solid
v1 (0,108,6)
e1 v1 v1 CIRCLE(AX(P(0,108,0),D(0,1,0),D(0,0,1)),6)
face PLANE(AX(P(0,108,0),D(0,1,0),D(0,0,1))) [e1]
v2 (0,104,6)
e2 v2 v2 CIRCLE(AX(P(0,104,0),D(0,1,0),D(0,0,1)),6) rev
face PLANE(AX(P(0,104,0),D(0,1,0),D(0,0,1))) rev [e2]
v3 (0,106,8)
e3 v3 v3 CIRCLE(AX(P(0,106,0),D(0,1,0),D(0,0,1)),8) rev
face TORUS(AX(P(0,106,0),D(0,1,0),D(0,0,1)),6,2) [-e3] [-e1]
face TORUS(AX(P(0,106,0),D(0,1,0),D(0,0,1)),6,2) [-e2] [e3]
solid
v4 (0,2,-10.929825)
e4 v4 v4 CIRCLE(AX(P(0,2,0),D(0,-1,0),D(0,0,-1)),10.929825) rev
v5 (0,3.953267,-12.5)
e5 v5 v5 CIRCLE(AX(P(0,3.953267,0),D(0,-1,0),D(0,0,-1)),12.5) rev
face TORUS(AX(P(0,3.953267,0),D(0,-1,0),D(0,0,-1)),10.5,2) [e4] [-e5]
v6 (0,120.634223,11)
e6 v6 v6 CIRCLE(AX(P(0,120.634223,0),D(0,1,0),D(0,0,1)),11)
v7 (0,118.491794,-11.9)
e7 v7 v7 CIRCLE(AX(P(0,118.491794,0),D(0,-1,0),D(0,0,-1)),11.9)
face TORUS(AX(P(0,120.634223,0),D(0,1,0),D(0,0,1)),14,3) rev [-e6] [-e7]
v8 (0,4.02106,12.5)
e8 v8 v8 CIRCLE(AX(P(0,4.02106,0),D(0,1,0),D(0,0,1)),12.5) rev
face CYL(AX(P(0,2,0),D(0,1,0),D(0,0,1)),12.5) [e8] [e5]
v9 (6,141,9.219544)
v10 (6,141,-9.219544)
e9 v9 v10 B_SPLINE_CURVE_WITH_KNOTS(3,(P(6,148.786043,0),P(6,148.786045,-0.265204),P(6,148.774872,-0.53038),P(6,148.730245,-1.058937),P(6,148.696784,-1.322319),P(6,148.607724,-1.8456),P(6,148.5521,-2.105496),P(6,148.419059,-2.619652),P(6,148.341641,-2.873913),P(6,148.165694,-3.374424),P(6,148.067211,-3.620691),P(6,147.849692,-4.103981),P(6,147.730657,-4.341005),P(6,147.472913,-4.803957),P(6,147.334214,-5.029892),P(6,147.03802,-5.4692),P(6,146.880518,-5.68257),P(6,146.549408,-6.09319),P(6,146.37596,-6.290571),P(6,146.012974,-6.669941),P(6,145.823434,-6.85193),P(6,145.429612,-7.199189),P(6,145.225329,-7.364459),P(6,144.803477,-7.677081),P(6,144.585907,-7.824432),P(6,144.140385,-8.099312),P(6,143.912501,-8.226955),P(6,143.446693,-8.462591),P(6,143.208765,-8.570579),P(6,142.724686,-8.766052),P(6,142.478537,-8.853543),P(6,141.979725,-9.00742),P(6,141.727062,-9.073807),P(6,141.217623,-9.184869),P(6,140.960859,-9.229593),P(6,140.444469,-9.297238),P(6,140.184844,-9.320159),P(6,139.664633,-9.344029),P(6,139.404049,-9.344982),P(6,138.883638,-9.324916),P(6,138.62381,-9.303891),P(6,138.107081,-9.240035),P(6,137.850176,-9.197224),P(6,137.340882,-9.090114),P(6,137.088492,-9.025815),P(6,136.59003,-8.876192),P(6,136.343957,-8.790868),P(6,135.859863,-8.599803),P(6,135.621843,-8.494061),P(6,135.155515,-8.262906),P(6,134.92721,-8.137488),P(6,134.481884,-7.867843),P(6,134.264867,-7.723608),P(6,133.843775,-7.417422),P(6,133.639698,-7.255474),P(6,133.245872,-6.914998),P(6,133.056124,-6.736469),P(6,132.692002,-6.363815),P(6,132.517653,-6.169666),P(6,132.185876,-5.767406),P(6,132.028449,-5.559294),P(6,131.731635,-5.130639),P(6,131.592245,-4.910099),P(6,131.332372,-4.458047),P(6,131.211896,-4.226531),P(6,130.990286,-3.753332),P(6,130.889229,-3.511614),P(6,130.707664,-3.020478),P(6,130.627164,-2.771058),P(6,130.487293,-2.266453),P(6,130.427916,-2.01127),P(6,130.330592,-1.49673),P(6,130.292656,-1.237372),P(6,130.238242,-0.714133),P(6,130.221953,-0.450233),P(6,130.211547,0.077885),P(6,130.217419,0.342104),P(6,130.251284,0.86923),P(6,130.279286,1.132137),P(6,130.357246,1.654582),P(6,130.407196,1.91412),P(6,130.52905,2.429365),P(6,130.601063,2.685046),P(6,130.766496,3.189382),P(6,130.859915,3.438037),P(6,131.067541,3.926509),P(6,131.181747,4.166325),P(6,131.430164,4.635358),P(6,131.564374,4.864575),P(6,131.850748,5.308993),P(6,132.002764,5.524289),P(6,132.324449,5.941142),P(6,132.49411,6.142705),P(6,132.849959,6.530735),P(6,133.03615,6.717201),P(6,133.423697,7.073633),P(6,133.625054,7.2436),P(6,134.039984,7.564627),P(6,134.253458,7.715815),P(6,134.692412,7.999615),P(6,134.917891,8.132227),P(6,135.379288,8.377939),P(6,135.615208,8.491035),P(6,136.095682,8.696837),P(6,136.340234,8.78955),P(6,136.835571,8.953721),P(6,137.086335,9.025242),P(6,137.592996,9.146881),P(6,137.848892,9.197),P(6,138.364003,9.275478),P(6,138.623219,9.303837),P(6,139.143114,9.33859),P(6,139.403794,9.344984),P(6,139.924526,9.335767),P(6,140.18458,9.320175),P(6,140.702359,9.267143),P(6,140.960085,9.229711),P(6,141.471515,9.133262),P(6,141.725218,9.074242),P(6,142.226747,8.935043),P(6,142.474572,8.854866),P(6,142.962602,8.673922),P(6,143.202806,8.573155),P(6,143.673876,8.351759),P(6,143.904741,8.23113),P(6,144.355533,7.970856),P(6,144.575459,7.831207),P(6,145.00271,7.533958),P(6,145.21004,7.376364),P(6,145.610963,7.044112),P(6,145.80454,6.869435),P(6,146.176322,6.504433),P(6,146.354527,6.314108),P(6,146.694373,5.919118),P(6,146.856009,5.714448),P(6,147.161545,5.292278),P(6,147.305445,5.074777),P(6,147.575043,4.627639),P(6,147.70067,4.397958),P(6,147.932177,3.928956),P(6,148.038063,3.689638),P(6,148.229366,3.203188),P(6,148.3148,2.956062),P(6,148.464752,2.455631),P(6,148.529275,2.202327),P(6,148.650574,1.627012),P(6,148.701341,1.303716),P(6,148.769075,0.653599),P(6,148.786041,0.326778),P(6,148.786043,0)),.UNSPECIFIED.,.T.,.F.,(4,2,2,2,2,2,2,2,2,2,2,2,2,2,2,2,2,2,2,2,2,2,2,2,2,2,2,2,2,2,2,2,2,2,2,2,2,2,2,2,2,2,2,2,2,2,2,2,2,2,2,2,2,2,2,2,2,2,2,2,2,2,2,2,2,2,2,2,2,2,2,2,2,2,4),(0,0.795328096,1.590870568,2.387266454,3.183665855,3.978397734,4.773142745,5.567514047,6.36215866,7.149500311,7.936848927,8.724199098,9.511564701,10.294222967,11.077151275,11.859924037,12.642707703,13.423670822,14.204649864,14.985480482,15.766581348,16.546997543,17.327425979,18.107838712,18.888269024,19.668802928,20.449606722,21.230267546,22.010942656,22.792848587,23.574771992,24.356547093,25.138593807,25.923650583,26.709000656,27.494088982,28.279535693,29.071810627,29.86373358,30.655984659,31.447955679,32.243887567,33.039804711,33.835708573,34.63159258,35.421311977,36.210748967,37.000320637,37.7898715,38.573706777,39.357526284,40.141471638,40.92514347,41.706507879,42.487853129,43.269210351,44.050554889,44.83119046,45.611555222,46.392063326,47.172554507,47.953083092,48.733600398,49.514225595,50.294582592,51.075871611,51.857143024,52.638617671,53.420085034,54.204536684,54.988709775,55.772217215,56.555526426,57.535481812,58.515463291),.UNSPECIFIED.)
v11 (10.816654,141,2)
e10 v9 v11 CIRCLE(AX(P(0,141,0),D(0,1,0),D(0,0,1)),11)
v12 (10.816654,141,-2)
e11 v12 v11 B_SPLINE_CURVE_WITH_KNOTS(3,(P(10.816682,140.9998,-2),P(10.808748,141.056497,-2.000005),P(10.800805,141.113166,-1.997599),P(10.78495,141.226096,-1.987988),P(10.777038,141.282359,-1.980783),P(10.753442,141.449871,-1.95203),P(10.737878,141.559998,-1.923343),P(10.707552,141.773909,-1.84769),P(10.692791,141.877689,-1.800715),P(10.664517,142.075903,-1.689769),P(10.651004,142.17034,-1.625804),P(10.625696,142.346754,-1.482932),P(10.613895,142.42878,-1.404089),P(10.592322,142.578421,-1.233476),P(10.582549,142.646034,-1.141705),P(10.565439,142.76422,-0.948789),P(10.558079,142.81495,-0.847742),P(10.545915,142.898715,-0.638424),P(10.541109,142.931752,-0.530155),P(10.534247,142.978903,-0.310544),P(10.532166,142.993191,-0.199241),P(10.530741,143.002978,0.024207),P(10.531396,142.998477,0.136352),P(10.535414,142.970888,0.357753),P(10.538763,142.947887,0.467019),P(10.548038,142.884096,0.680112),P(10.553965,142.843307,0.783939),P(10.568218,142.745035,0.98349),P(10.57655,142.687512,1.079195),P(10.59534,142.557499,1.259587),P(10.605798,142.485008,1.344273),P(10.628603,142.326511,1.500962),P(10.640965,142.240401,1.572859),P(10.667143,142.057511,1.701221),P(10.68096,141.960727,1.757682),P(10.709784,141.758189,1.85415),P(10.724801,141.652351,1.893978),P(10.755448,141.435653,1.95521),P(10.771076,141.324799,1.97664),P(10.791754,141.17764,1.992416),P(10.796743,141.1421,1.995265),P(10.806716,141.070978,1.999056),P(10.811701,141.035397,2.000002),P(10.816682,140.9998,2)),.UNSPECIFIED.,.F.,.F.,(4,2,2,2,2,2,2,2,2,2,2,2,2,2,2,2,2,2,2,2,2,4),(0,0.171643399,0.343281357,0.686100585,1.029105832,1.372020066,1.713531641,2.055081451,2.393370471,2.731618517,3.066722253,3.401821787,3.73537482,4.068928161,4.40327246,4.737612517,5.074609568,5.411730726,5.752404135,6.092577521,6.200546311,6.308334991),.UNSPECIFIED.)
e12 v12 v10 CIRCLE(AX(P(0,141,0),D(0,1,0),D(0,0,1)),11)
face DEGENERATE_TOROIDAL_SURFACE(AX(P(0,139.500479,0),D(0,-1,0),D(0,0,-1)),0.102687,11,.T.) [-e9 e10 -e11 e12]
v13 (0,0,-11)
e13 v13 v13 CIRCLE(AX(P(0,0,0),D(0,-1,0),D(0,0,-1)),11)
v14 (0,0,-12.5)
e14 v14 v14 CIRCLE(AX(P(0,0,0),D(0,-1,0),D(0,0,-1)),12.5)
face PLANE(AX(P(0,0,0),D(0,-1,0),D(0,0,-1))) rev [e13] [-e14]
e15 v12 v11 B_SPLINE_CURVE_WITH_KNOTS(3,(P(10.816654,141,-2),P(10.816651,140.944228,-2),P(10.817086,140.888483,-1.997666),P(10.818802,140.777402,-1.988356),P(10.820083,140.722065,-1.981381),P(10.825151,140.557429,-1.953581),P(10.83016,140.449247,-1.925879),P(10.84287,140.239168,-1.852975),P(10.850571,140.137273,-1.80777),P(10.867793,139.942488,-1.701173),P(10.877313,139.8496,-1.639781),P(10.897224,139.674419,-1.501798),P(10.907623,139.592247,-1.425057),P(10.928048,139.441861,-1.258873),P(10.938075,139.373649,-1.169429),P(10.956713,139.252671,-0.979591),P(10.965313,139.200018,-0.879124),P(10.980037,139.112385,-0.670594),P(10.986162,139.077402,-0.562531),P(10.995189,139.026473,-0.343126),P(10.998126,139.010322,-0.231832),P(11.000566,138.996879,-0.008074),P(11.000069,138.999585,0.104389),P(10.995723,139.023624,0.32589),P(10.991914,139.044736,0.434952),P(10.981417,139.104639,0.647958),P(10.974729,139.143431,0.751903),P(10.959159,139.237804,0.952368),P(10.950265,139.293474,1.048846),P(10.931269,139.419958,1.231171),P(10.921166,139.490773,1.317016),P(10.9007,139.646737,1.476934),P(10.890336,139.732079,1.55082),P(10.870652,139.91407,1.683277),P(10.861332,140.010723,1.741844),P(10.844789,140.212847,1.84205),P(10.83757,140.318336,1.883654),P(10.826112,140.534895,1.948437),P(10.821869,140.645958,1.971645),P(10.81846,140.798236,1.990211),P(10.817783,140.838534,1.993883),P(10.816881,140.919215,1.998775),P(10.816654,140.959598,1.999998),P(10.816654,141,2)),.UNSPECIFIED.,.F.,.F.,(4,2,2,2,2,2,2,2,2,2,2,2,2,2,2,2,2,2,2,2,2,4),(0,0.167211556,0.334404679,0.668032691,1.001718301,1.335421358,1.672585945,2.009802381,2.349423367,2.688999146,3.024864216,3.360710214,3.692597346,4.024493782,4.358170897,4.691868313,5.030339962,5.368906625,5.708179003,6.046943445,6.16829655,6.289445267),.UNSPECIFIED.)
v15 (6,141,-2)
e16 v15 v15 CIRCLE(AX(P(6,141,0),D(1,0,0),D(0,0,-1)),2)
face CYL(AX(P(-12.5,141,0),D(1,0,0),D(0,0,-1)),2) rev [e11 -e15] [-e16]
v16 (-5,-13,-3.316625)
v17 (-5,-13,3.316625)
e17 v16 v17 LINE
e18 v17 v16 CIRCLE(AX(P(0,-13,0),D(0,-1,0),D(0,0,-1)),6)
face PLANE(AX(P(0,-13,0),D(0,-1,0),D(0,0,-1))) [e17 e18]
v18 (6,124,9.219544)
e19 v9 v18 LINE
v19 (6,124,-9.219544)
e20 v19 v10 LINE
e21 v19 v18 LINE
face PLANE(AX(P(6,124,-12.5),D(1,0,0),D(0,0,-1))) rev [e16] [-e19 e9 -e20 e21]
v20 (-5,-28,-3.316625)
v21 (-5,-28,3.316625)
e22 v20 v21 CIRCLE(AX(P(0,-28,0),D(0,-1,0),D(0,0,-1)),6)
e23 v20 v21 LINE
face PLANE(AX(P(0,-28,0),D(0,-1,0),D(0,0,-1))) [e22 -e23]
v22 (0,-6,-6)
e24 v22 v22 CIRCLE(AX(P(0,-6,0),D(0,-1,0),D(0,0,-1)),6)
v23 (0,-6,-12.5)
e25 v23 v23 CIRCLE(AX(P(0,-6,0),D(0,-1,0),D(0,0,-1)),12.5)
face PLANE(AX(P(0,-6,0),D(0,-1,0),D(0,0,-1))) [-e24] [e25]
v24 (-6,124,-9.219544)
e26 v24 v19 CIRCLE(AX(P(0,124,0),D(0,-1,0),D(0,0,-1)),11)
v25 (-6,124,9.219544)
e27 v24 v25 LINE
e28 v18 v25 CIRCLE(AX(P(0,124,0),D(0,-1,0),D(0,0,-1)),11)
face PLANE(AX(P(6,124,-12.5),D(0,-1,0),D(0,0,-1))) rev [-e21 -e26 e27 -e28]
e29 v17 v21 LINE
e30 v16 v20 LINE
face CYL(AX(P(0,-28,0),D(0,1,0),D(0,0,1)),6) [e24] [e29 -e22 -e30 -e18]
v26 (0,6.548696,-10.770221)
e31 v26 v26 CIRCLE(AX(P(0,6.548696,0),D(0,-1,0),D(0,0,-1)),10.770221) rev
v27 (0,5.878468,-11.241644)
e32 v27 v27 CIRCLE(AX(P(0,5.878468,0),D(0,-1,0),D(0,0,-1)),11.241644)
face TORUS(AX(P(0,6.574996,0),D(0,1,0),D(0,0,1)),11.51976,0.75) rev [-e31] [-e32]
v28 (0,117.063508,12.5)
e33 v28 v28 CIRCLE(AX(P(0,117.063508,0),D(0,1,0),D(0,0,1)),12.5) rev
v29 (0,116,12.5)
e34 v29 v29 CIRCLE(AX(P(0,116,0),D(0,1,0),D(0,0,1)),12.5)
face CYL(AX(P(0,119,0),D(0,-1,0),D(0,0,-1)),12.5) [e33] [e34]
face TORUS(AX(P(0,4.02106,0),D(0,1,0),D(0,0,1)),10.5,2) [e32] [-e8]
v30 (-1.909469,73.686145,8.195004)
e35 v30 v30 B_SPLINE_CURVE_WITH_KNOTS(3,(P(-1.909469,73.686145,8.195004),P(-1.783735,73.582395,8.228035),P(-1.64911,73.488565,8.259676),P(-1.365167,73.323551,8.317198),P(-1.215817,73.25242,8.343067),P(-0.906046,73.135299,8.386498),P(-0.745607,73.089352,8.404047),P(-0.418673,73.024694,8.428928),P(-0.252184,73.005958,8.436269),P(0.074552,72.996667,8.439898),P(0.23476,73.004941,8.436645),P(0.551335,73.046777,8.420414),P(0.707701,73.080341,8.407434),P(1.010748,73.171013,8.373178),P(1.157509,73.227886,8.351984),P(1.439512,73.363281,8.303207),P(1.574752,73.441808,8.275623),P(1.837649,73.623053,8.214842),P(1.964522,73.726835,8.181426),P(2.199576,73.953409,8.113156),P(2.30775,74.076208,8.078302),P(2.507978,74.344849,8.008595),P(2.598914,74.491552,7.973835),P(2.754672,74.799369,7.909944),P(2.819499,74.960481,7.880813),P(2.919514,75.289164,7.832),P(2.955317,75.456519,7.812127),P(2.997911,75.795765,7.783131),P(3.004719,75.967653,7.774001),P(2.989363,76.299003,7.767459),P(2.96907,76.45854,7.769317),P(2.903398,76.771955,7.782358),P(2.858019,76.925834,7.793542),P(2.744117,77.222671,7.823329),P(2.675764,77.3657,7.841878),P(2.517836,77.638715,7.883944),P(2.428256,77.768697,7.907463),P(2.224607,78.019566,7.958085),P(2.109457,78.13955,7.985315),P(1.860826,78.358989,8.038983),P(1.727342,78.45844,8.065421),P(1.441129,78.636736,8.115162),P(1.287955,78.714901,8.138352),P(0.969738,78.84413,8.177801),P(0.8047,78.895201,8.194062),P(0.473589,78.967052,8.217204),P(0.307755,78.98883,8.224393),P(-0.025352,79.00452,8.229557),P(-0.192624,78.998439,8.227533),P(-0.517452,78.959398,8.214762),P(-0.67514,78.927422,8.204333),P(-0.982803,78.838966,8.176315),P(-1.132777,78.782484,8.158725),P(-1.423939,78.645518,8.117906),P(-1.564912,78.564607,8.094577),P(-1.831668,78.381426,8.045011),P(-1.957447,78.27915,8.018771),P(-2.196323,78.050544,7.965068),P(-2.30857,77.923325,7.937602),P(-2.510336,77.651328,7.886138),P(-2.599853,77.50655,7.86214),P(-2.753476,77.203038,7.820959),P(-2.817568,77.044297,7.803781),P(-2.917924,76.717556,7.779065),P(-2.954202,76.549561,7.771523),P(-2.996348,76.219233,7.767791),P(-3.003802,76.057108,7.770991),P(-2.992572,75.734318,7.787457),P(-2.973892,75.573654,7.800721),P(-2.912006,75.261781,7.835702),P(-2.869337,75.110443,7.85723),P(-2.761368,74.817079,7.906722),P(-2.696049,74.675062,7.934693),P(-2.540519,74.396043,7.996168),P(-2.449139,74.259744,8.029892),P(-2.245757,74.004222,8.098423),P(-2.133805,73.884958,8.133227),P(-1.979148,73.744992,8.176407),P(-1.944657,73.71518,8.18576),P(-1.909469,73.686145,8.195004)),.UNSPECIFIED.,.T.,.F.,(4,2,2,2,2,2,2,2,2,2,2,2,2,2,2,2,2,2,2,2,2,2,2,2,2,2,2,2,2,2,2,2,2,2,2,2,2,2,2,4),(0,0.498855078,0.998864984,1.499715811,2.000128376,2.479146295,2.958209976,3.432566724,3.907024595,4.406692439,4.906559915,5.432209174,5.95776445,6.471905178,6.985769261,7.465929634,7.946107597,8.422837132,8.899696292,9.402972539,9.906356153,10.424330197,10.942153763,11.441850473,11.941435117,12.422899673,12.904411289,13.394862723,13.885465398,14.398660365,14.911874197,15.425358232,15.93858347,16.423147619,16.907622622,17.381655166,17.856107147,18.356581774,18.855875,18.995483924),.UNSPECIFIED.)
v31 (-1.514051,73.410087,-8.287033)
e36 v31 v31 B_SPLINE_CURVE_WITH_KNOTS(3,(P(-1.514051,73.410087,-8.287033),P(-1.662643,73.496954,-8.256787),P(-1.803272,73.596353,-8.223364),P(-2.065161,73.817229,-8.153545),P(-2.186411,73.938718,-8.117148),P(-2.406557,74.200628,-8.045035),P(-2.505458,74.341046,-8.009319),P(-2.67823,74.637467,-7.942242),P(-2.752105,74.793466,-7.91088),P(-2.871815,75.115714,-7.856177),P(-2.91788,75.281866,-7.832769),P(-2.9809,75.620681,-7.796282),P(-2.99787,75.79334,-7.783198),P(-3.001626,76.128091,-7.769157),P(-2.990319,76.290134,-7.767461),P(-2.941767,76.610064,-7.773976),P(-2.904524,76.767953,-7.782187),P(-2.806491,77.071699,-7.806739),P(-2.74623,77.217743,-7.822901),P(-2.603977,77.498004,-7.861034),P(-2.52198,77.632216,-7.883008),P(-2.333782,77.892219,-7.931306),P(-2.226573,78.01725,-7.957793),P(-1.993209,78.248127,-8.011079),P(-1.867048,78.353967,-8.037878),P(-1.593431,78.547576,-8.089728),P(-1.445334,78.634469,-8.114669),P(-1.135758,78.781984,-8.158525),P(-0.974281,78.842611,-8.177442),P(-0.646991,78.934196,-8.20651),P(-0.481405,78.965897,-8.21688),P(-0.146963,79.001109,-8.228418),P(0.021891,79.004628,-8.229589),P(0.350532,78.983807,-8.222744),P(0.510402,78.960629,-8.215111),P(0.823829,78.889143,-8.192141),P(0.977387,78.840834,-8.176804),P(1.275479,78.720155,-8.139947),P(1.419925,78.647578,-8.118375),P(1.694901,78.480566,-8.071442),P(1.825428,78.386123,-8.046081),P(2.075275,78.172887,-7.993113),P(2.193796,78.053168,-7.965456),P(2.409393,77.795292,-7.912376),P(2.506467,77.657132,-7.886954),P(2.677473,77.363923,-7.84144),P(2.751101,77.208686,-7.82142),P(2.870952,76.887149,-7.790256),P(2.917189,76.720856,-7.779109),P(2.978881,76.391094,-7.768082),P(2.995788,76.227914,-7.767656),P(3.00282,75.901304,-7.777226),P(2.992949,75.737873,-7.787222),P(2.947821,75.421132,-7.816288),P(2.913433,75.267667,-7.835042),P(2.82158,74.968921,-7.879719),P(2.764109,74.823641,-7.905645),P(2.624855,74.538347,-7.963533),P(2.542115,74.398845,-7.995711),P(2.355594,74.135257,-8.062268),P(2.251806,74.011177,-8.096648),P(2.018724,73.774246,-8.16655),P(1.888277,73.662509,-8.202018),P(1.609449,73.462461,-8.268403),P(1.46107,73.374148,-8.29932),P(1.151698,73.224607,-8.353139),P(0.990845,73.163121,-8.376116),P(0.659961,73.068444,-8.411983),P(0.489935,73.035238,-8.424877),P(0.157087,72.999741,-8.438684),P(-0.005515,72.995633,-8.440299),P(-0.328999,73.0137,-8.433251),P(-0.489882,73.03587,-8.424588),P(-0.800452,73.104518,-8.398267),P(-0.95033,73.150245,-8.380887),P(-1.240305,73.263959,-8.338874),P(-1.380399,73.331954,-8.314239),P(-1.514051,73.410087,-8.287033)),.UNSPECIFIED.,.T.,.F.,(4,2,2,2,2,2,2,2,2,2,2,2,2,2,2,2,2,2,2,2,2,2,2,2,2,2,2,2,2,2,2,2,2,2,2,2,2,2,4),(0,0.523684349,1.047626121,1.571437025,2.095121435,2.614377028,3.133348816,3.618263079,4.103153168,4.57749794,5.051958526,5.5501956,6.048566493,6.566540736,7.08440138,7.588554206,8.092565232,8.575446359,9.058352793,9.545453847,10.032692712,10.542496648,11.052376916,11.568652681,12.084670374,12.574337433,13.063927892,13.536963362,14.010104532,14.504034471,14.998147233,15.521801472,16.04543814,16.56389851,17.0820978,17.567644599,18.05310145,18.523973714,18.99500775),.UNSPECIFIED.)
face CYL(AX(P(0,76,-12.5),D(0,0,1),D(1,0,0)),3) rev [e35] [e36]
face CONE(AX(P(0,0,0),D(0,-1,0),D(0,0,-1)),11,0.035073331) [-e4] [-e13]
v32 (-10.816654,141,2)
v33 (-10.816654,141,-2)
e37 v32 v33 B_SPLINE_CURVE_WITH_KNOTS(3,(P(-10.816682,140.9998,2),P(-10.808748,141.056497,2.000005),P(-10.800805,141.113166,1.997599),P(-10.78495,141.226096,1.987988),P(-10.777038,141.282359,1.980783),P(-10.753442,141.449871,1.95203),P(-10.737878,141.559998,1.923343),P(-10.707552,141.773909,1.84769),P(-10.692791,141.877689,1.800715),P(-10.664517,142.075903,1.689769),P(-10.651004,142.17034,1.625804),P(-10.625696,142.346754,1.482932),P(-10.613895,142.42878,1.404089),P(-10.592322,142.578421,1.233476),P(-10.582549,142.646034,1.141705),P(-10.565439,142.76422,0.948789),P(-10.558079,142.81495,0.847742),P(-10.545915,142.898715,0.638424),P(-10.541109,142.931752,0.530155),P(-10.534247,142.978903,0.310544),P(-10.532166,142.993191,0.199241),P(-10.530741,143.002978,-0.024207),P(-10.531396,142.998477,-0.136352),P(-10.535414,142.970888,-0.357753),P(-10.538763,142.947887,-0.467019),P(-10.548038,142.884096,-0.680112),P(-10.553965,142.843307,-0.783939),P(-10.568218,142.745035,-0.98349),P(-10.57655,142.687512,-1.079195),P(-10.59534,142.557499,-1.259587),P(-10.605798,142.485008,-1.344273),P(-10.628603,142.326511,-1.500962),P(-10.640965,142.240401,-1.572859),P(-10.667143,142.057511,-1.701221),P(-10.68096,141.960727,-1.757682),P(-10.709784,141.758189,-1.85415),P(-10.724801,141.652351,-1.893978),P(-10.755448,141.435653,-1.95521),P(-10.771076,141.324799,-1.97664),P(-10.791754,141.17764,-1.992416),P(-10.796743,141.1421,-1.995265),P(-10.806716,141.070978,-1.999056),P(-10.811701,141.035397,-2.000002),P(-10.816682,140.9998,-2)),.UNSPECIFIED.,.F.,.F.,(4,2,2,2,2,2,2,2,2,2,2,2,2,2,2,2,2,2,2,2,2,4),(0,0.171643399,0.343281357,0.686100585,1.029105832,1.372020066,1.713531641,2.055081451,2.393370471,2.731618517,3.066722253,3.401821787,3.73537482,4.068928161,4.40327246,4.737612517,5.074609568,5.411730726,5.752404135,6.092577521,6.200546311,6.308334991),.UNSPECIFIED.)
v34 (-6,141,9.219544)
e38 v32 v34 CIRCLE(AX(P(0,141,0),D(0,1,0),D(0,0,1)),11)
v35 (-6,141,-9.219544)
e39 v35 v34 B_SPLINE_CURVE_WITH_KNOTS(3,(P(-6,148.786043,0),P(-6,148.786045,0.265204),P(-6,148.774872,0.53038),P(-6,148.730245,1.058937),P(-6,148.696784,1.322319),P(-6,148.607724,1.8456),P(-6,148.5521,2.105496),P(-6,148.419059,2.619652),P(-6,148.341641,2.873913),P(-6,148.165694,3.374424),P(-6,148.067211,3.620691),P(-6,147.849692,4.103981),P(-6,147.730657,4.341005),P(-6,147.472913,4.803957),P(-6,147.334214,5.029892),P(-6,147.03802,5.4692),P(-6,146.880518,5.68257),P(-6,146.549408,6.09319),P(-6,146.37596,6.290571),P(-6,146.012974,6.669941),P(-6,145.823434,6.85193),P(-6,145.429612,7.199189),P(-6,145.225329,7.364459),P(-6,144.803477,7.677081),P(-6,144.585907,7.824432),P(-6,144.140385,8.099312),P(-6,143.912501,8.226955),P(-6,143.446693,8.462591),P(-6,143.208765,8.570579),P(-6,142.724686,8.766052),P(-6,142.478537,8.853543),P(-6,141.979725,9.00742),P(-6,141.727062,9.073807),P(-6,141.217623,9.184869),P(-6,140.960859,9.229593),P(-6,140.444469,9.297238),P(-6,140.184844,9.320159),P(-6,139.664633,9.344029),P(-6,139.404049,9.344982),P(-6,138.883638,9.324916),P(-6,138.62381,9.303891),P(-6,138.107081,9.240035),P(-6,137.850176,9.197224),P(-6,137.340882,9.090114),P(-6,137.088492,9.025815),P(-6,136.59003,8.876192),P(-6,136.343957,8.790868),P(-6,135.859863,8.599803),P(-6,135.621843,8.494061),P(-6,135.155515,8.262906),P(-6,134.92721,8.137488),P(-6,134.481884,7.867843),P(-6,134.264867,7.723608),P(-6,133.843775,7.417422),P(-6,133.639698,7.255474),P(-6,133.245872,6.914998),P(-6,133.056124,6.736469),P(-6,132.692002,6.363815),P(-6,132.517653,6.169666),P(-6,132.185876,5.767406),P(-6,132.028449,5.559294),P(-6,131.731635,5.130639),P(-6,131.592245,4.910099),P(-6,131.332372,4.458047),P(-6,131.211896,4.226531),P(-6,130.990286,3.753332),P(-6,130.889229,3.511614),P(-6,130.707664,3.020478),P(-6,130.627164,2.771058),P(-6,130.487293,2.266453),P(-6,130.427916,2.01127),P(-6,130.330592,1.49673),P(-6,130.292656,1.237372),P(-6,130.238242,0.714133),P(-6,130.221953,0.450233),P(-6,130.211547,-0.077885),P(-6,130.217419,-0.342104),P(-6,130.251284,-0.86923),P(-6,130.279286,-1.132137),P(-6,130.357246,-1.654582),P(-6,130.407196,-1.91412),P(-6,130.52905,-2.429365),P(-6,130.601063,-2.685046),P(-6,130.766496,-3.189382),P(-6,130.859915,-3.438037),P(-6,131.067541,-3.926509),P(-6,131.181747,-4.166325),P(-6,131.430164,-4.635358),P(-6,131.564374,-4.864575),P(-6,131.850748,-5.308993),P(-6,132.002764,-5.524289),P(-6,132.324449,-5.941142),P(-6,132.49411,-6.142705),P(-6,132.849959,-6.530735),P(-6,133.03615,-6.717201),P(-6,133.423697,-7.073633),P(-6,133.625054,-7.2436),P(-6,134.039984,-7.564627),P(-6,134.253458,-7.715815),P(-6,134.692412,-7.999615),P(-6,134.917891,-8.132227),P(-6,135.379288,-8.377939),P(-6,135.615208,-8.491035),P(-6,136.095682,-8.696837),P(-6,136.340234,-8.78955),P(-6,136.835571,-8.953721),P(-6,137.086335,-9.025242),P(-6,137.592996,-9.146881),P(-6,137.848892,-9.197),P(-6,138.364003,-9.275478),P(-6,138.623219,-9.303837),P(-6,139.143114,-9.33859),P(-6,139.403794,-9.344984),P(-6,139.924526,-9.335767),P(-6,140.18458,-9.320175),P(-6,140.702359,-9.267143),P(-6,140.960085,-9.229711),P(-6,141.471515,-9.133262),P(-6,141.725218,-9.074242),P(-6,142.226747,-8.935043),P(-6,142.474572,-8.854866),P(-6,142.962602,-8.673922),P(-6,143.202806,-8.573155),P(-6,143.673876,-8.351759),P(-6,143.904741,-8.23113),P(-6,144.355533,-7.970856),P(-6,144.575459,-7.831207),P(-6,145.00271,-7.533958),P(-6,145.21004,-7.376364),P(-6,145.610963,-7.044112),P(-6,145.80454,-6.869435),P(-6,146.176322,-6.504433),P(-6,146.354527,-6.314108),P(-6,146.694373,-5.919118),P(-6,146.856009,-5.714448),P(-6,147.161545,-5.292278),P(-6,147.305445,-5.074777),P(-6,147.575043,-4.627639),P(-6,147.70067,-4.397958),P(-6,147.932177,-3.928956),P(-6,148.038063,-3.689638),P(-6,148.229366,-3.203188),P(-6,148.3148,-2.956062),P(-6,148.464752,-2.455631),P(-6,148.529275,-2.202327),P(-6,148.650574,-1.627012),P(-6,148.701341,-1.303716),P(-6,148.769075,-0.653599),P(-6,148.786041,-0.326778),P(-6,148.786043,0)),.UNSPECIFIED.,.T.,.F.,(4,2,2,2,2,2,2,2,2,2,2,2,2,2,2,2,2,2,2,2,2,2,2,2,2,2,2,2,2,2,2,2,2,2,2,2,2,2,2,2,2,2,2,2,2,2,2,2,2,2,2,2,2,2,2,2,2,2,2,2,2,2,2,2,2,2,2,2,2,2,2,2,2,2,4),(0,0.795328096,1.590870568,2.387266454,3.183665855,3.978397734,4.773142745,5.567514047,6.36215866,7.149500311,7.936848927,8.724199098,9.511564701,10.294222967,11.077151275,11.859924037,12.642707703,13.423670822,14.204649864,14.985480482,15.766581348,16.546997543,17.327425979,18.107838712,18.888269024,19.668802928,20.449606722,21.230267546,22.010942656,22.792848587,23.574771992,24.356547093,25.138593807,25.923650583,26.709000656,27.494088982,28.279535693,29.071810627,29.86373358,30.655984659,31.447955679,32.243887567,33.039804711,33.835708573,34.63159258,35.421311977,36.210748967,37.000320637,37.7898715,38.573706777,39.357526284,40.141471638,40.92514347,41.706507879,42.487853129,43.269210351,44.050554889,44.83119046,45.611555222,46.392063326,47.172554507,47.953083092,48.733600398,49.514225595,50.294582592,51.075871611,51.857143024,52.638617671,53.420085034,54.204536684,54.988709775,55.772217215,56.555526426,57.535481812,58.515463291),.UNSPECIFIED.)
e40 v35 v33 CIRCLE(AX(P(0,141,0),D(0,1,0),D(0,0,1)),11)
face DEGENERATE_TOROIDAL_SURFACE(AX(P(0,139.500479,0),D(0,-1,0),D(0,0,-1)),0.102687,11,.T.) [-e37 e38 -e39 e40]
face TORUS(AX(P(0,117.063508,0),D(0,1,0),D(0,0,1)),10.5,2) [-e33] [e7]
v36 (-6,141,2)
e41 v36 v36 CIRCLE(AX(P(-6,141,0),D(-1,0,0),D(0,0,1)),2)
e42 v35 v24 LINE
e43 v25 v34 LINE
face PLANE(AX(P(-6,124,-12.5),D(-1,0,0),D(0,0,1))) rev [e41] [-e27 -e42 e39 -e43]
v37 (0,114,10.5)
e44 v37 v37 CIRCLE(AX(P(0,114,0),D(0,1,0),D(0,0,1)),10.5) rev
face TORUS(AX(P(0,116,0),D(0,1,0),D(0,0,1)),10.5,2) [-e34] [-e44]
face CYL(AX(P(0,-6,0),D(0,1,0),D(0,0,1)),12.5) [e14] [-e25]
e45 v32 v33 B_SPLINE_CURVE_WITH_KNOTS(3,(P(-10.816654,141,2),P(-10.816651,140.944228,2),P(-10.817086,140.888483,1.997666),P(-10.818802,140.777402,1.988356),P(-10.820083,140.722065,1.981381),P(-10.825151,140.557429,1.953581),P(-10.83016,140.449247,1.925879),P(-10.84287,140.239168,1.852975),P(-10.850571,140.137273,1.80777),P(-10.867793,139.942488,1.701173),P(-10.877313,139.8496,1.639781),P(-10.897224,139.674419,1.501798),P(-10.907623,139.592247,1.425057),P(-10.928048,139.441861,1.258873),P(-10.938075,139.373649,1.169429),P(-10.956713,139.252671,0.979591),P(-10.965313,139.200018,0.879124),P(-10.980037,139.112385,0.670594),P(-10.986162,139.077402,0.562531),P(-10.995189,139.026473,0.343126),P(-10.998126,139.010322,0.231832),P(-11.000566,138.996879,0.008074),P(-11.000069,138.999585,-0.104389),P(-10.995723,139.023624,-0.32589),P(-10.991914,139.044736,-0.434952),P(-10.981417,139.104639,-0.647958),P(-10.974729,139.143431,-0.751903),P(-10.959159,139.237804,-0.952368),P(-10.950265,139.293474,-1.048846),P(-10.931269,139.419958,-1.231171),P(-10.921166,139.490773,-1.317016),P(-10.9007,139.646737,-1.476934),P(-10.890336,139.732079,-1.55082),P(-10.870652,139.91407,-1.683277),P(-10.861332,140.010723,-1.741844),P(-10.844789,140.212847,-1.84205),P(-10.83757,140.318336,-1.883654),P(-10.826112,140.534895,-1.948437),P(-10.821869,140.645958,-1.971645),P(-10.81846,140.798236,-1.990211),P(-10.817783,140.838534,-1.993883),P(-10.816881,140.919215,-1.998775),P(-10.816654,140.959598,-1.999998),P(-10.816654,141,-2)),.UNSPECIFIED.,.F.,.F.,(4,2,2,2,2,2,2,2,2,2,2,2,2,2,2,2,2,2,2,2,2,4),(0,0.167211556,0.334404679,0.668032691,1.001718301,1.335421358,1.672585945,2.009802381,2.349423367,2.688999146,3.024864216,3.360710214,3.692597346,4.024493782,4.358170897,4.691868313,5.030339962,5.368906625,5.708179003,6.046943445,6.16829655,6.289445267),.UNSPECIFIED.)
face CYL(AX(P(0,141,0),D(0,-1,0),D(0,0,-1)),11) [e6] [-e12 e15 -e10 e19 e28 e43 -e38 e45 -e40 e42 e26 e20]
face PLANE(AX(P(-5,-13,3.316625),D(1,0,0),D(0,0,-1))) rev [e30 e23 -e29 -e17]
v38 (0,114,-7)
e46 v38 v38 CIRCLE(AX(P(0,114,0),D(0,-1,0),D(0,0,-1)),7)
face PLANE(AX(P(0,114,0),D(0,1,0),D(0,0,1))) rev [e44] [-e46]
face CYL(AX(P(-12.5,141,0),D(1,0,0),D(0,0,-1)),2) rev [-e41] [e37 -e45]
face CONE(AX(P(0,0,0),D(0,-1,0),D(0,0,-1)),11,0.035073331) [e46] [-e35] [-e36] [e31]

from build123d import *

# Parameters (mm, degrees)
SKETCH3_R               = 12.5
BOSS_EXTRUDE1_DEPTH     = 6
BOSS_EXTRUDE3_START     = -12
SKETCH5_R               = 12.5
BOSS_EXTRUDE3_DEPTH     = 4
FILLET1_R               = 2
SKETCH6_R               = 6
BOSS_EXTRUDE4_DEPTH     = 22
CUT_EXTRUDE1_START      = -15
CUT_EXTRUDE1_DEPTH      = 15
BOSS_EXTRUDE5_START     = -8
SKETCH8_R               = 8
BOSS_EXTRUDE5_DEPTH     = 2
FILLET2_R               = 2
BOSS_EXTRUDE6_START     = 5
SKETCH9_R               = 12.5
BOSS_EXTRUDE6_DEPTH     = 5
SKETCH10_R              = 11
BOSS_EXTRUDE7_DEPTH     = 22
FILLET3_R               = 2
FILLET4_R               = 3
FILLET5_R               = 0.75
CUT_EXTRUDE2_DEPTH      = 152.535125655
CUT_EXTRUDE2_DEPTH_BACK = 152.535125655
SKETCH12_W              = 12
SKETCH12_H              = 28
CUT_EXTRUDE3_DEPTH      = 150.832528731
CUT_EXTRUDE3_DEPTH_BACK = 150.832528731
SKETCH13_R              = 3
CUT_EXTRUDE4_DEPTH      = 150.832528731
CUT_EXTRUDE4_DEPTH_BACK = 150.832528731
SKETCH14_R              = 2


# Some blends are built 0.0001 mm under size
with BuildPart() as part:
    # Sketch2 → Revolve1 (revolve)
    with BuildSketch(Plane.XY, mode=Mode.PRIVATE) as revolve1_sk:
        Polygon((0, 0), (0, 114), (7, 114), (11, 0), align=None)
    revolve(revolve1_sk.sketch.rotate(Axis((0, 0, 0), (0, 1, 0)), 90), axis=Axis((0, 0, 0), (0, 1, 0)))

    # Sketch3 → Boss-Extrude1 (add)
    with BuildSketch(Plane.XZ):
        with Locations(Location((0, 0, 0), (0, 0, 270))):
            Circle(SKETCH3_R)
    extrude(amount=BOSS_EXTRUDE1_DEPTH)

    # Sketch5 → Boss-Extrude3 (add)
    with BuildSketch(Plane.XZ.offset(6).offset(BOSS_EXTRUDE3_START)):
        with Locations(Location((0, 0, 0), (0, 0, 270))):
            Circle(SKETCH5_R)
    extrude(amount=BOSS_EXTRUDE3_DEPTH)

    # Fillet1
    # the kernel refuses this fillet: 2 mm, written as the material it takes off along each edge
    with BuildSketch(Plane(origin=(0, 6, 0), x_dir=(0, 0, -1), z_dir=(-1, 0, 0))) as fillet1_piece_1:
        with BuildLine():
            CenterArc((10.5, 1.97894037), FILLET1_R, 278.322040599, 81.677959401)
            Line((10.789473684, 0), (10.795263158, -0.039578807))
            ThreePointArc((10.795263158, -0.039578807), (11.644736842, -0.04), (12.5, -0.04))
            Line((12.5, -0.04), (12.54, 0))
            Line((12.54, 0), (12.54, 1.97894037))
            Line((12.54, 1.97894037), (12.5, 1.97894037))
        make_face()
    revolve(axis=Axis((0, 6, 0), (0, -1, 0)), mode=Mode.SUBTRACT)
    with BuildSketch(Plane(origin=(0, 2, 0), x_dir=(0, 0, -1), z_dir=(-1, 0, 0))) as fillet1_piece_2:
        with BuildLine():
            CenterArc((10.5, -1.953266712), FILLET1_R, 0, 77.589618941)
            Line((12.5, -1.953266712), (12.54, -1.953266712))
            Line((12.54, -1.953266712), (12.54, 0))
            Line((12.54, 0), (12.5, 0.04))
            ThreePointArc((12.5, 0.04), (11.714912281, 0.04), (10.938421053, 0.039065334))
            Line((10.938421053, 0.039065334), (10.929824561, 0))
        make_face()
    revolve(axis=Axis((0, 2, 0), (0, -1, 0)), mode=Mode.SUBTRACT)

    # Sketch6 → Boss-Extrude4 (add)
    with BuildSketch(Plane.XZ.offset(6)):
        with Locations(Location((0, 0, 0), (0, 0, 270))):
            Circle(SKETCH6_R)
    extrude(amount=BOSS_EXTRUDE4_DEPTH)

    # Sketch7 → Cut-Extrude1 (cut)
    with BuildSketch(Plane.XZ.offset(28).offset(CUT_EXTRUDE1_START)):
        with BuildLine():
            Line((-5, 3.31662479), (-5, -3.31662479))
            ThreePointArc((-5, -3.31662479), (-6, 0), (-5, 3.31662479))
        make_face()
    extrude(amount=CUT_EXTRUDE1_DEPTH, mode=Mode.SUBTRACT)

    # Sketch9 → Boss-Extrude6 (add)
    with BuildSketch(Plane(origin=(0, 114, 0), x_dir=(1, 0, 0), z_dir=(0, 1, 0)).offset(BOSS_EXTRUDE6_START)):
        with Locations(Location((0, 0, 0), (0, 0, 90))):
            Circle(SKETCH9_R)
    extrude(amount=-BOSS_EXTRUDE6_DEPTH)

    # Sketch10 → Boss-Extrude7 (add)
    with BuildSketch(Plane(origin=(0, 119, 0), x_dir=(1, 0, 0), z_dir=(0, 1, 0))):
        with Locations(Location((0, 0, 0), (0, 0, 270))):
            Circle(SKETCH10_R)
    extrude(amount=BOSS_EXTRUDE7_DEPTH)

    # Fillet3
    # the kernel refuses this fillet: 2 mm, written as the material it takes off along each edge
    with BuildSketch(Plane(origin=(0, 114, 0), x_dir=(0, 0, -1), z_dir=(1, 0, 0))) as fillet3_piece_1:
        with BuildLine():
            CenterArc((12.5 - FILLET3_R, FILLET3_R), FILLET3_R, 270, 90)
            Line((12.5 - FILLET3_R, 0), (12.5 - FILLET3_R, -FILLET3_R * 0.02))
            Line((12.5 - FILLET3_R, -FILLET3_R * 0.02), (12.5 + FILLET3_R * 0.02, -FILLET3_R * 0.02))
            Line((12.5 + FILLET3_R * 0.02, -FILLET3_R * 0.02), (12.5 + FILLET3_R * 0.02, FILLET3_R))
            Line((12.5 + FILLET3_R * 0.02, FILLET3_R), (12.5, FILLET3_R))
        make_face()
    revolve(axis=Axis((0, 114, 0), (0, 1, 0)), mode=Mode.SUBTRACT)
    with BuildSketch(Plane(origin=(0, 119, 0), x_dir=(0, 0, -1), z_dir=(1, 0, 0))) as fillet3_piece_2:
        with BuildLine():
            CenterArc((10.5, -1.936491673), FILLET3_R, 0, 75.522487814)
            Line((11, 0), (11.01, 0.038729833))
            ThreePointArc((11.01, 0.038729833), (11.75, 0.04), (12.5, 0.04))
            Line((12.5, 0.04), (12.54, 0))
            Line((12.54, 0), (12.54, -1.936491673))
            Line((12.54, -1.936491673), (12.5, -1.936491673))
        make_face()
    revolve(axis=Axis((0, 119, 0), (0, 1, 0)), mode=Mode.SUBTRACT)

    # Fillet4
    fillet4_edges = [part.edges().sort_by_distance(p)[0] for p in [
        (-11, 119, 0),
    ]]
    fillet(fillet4_edges, radius=FILLET4_R)

    # Fillet5
    fillet5_edges = [part.edges().sort_by_distance(p)[0] for p in [
        (0, 6, 10.789473684),
    ]]
    fillet(fillet5_edges, radius=FILLET5_R)

    # Sketch11 → Revolve2 (revolve)
    with BuildSketch(Plane.XY, mode=Mode.PRIVATE) as revolve2_sk:
        with BuildLine():
            Line((11, 141), (0, 141))
            Line((0, 141), (0, 150.5))
            ThreePointArc((0, 150.5), (7.292505249, 147.825532394), (11, 141))
        make_face()
    revolve(revolve2_sk.sketch.rotate(Axis((0, 141, 0), (0, 1, 0)), 270), axis=Axis((0, 141, 0), (0, 1, 0)))

    # Sketch12 → Cut-Extrude2 (cut, two sides: drawn at the far end of the back side and taken through both)
    with BuildSketch(Plane.XY.offset(-CUT_EXTRUDE2_DEPTH_BACK)):
        with Locations((0, 138)):
            Rectangle(SKETCH12_W, SKETCH12_H)
    extrude(amount=CUT_EXTRUDE2_DEPTH + CUT_EXTRUDE2_DEPTH_BACK, mode=Mode.SUBTRACT)

    # Sketch13 → Cut-Extrude3 (cut, two sides: drawn at the far end of the back side and taken through both)
    with BuildSketch(Plane.XY.offset(-CUT_EXTRUDE3_DEPTH_BACK)):
        with Locations(Location((0, 76, 0), (0, 0, 270.000000009))):
            Circle(SKETCH13_R)
    extrude(amount=CUT_EXTRUDE3_DEPTH + CUT_EXTRUDE3_DEPTH_BACK, mode=Mode.SUBTRACT)

    # Sketch14 → Cut-Extrude4 (cut, two sides: drawn at the far end of the back side and taken through both)
    with BuildSketch(Plane(origin=(0, 0, 0), x_dir=(0, 0, -1), z_dir=(1, 0, 0)).offset(-CUT_EXTRUDE4_DEPTH_BACK)):
        with Locations((0, 141)):
            Circle(SKETCH14_R)
    extrude(amount=CUT_EXTRUDE4_DEPTH + CUT_EXTRUDE4_DEPTH_BACK, mode=Mode.SUBTRACT)


with BuildPart() as body_2:
    # Sketch8 → Boss-Extrude5 (new, symmetric)
    with BuildSketch(Plane(origin=(0, 114, 0), x_dir=(1, 0, 0), z_dir=(0, 1, 0)).offset(BOSS_EXTRUDE5_START)):
        with Locations(Location((0, 0, 0), (0, 0, 270))):
            Circle(SKETCH8_R)
    extrude(amount=BOSS_EXTRUDE5_DEPTH, both=True)

    # Fillet2
    fillet2_edges = [body_2.edges().sort_by_distance(p)[0] for p in [
        (0, 104, -8),
        (0, 108, -8),
    ]]
    fillet(fillet2_edges, radius=FILLET2_R - 0.0001)  # a hair under: the kernel refuses the full size


solid = Compound([part.part, body_2.part])
